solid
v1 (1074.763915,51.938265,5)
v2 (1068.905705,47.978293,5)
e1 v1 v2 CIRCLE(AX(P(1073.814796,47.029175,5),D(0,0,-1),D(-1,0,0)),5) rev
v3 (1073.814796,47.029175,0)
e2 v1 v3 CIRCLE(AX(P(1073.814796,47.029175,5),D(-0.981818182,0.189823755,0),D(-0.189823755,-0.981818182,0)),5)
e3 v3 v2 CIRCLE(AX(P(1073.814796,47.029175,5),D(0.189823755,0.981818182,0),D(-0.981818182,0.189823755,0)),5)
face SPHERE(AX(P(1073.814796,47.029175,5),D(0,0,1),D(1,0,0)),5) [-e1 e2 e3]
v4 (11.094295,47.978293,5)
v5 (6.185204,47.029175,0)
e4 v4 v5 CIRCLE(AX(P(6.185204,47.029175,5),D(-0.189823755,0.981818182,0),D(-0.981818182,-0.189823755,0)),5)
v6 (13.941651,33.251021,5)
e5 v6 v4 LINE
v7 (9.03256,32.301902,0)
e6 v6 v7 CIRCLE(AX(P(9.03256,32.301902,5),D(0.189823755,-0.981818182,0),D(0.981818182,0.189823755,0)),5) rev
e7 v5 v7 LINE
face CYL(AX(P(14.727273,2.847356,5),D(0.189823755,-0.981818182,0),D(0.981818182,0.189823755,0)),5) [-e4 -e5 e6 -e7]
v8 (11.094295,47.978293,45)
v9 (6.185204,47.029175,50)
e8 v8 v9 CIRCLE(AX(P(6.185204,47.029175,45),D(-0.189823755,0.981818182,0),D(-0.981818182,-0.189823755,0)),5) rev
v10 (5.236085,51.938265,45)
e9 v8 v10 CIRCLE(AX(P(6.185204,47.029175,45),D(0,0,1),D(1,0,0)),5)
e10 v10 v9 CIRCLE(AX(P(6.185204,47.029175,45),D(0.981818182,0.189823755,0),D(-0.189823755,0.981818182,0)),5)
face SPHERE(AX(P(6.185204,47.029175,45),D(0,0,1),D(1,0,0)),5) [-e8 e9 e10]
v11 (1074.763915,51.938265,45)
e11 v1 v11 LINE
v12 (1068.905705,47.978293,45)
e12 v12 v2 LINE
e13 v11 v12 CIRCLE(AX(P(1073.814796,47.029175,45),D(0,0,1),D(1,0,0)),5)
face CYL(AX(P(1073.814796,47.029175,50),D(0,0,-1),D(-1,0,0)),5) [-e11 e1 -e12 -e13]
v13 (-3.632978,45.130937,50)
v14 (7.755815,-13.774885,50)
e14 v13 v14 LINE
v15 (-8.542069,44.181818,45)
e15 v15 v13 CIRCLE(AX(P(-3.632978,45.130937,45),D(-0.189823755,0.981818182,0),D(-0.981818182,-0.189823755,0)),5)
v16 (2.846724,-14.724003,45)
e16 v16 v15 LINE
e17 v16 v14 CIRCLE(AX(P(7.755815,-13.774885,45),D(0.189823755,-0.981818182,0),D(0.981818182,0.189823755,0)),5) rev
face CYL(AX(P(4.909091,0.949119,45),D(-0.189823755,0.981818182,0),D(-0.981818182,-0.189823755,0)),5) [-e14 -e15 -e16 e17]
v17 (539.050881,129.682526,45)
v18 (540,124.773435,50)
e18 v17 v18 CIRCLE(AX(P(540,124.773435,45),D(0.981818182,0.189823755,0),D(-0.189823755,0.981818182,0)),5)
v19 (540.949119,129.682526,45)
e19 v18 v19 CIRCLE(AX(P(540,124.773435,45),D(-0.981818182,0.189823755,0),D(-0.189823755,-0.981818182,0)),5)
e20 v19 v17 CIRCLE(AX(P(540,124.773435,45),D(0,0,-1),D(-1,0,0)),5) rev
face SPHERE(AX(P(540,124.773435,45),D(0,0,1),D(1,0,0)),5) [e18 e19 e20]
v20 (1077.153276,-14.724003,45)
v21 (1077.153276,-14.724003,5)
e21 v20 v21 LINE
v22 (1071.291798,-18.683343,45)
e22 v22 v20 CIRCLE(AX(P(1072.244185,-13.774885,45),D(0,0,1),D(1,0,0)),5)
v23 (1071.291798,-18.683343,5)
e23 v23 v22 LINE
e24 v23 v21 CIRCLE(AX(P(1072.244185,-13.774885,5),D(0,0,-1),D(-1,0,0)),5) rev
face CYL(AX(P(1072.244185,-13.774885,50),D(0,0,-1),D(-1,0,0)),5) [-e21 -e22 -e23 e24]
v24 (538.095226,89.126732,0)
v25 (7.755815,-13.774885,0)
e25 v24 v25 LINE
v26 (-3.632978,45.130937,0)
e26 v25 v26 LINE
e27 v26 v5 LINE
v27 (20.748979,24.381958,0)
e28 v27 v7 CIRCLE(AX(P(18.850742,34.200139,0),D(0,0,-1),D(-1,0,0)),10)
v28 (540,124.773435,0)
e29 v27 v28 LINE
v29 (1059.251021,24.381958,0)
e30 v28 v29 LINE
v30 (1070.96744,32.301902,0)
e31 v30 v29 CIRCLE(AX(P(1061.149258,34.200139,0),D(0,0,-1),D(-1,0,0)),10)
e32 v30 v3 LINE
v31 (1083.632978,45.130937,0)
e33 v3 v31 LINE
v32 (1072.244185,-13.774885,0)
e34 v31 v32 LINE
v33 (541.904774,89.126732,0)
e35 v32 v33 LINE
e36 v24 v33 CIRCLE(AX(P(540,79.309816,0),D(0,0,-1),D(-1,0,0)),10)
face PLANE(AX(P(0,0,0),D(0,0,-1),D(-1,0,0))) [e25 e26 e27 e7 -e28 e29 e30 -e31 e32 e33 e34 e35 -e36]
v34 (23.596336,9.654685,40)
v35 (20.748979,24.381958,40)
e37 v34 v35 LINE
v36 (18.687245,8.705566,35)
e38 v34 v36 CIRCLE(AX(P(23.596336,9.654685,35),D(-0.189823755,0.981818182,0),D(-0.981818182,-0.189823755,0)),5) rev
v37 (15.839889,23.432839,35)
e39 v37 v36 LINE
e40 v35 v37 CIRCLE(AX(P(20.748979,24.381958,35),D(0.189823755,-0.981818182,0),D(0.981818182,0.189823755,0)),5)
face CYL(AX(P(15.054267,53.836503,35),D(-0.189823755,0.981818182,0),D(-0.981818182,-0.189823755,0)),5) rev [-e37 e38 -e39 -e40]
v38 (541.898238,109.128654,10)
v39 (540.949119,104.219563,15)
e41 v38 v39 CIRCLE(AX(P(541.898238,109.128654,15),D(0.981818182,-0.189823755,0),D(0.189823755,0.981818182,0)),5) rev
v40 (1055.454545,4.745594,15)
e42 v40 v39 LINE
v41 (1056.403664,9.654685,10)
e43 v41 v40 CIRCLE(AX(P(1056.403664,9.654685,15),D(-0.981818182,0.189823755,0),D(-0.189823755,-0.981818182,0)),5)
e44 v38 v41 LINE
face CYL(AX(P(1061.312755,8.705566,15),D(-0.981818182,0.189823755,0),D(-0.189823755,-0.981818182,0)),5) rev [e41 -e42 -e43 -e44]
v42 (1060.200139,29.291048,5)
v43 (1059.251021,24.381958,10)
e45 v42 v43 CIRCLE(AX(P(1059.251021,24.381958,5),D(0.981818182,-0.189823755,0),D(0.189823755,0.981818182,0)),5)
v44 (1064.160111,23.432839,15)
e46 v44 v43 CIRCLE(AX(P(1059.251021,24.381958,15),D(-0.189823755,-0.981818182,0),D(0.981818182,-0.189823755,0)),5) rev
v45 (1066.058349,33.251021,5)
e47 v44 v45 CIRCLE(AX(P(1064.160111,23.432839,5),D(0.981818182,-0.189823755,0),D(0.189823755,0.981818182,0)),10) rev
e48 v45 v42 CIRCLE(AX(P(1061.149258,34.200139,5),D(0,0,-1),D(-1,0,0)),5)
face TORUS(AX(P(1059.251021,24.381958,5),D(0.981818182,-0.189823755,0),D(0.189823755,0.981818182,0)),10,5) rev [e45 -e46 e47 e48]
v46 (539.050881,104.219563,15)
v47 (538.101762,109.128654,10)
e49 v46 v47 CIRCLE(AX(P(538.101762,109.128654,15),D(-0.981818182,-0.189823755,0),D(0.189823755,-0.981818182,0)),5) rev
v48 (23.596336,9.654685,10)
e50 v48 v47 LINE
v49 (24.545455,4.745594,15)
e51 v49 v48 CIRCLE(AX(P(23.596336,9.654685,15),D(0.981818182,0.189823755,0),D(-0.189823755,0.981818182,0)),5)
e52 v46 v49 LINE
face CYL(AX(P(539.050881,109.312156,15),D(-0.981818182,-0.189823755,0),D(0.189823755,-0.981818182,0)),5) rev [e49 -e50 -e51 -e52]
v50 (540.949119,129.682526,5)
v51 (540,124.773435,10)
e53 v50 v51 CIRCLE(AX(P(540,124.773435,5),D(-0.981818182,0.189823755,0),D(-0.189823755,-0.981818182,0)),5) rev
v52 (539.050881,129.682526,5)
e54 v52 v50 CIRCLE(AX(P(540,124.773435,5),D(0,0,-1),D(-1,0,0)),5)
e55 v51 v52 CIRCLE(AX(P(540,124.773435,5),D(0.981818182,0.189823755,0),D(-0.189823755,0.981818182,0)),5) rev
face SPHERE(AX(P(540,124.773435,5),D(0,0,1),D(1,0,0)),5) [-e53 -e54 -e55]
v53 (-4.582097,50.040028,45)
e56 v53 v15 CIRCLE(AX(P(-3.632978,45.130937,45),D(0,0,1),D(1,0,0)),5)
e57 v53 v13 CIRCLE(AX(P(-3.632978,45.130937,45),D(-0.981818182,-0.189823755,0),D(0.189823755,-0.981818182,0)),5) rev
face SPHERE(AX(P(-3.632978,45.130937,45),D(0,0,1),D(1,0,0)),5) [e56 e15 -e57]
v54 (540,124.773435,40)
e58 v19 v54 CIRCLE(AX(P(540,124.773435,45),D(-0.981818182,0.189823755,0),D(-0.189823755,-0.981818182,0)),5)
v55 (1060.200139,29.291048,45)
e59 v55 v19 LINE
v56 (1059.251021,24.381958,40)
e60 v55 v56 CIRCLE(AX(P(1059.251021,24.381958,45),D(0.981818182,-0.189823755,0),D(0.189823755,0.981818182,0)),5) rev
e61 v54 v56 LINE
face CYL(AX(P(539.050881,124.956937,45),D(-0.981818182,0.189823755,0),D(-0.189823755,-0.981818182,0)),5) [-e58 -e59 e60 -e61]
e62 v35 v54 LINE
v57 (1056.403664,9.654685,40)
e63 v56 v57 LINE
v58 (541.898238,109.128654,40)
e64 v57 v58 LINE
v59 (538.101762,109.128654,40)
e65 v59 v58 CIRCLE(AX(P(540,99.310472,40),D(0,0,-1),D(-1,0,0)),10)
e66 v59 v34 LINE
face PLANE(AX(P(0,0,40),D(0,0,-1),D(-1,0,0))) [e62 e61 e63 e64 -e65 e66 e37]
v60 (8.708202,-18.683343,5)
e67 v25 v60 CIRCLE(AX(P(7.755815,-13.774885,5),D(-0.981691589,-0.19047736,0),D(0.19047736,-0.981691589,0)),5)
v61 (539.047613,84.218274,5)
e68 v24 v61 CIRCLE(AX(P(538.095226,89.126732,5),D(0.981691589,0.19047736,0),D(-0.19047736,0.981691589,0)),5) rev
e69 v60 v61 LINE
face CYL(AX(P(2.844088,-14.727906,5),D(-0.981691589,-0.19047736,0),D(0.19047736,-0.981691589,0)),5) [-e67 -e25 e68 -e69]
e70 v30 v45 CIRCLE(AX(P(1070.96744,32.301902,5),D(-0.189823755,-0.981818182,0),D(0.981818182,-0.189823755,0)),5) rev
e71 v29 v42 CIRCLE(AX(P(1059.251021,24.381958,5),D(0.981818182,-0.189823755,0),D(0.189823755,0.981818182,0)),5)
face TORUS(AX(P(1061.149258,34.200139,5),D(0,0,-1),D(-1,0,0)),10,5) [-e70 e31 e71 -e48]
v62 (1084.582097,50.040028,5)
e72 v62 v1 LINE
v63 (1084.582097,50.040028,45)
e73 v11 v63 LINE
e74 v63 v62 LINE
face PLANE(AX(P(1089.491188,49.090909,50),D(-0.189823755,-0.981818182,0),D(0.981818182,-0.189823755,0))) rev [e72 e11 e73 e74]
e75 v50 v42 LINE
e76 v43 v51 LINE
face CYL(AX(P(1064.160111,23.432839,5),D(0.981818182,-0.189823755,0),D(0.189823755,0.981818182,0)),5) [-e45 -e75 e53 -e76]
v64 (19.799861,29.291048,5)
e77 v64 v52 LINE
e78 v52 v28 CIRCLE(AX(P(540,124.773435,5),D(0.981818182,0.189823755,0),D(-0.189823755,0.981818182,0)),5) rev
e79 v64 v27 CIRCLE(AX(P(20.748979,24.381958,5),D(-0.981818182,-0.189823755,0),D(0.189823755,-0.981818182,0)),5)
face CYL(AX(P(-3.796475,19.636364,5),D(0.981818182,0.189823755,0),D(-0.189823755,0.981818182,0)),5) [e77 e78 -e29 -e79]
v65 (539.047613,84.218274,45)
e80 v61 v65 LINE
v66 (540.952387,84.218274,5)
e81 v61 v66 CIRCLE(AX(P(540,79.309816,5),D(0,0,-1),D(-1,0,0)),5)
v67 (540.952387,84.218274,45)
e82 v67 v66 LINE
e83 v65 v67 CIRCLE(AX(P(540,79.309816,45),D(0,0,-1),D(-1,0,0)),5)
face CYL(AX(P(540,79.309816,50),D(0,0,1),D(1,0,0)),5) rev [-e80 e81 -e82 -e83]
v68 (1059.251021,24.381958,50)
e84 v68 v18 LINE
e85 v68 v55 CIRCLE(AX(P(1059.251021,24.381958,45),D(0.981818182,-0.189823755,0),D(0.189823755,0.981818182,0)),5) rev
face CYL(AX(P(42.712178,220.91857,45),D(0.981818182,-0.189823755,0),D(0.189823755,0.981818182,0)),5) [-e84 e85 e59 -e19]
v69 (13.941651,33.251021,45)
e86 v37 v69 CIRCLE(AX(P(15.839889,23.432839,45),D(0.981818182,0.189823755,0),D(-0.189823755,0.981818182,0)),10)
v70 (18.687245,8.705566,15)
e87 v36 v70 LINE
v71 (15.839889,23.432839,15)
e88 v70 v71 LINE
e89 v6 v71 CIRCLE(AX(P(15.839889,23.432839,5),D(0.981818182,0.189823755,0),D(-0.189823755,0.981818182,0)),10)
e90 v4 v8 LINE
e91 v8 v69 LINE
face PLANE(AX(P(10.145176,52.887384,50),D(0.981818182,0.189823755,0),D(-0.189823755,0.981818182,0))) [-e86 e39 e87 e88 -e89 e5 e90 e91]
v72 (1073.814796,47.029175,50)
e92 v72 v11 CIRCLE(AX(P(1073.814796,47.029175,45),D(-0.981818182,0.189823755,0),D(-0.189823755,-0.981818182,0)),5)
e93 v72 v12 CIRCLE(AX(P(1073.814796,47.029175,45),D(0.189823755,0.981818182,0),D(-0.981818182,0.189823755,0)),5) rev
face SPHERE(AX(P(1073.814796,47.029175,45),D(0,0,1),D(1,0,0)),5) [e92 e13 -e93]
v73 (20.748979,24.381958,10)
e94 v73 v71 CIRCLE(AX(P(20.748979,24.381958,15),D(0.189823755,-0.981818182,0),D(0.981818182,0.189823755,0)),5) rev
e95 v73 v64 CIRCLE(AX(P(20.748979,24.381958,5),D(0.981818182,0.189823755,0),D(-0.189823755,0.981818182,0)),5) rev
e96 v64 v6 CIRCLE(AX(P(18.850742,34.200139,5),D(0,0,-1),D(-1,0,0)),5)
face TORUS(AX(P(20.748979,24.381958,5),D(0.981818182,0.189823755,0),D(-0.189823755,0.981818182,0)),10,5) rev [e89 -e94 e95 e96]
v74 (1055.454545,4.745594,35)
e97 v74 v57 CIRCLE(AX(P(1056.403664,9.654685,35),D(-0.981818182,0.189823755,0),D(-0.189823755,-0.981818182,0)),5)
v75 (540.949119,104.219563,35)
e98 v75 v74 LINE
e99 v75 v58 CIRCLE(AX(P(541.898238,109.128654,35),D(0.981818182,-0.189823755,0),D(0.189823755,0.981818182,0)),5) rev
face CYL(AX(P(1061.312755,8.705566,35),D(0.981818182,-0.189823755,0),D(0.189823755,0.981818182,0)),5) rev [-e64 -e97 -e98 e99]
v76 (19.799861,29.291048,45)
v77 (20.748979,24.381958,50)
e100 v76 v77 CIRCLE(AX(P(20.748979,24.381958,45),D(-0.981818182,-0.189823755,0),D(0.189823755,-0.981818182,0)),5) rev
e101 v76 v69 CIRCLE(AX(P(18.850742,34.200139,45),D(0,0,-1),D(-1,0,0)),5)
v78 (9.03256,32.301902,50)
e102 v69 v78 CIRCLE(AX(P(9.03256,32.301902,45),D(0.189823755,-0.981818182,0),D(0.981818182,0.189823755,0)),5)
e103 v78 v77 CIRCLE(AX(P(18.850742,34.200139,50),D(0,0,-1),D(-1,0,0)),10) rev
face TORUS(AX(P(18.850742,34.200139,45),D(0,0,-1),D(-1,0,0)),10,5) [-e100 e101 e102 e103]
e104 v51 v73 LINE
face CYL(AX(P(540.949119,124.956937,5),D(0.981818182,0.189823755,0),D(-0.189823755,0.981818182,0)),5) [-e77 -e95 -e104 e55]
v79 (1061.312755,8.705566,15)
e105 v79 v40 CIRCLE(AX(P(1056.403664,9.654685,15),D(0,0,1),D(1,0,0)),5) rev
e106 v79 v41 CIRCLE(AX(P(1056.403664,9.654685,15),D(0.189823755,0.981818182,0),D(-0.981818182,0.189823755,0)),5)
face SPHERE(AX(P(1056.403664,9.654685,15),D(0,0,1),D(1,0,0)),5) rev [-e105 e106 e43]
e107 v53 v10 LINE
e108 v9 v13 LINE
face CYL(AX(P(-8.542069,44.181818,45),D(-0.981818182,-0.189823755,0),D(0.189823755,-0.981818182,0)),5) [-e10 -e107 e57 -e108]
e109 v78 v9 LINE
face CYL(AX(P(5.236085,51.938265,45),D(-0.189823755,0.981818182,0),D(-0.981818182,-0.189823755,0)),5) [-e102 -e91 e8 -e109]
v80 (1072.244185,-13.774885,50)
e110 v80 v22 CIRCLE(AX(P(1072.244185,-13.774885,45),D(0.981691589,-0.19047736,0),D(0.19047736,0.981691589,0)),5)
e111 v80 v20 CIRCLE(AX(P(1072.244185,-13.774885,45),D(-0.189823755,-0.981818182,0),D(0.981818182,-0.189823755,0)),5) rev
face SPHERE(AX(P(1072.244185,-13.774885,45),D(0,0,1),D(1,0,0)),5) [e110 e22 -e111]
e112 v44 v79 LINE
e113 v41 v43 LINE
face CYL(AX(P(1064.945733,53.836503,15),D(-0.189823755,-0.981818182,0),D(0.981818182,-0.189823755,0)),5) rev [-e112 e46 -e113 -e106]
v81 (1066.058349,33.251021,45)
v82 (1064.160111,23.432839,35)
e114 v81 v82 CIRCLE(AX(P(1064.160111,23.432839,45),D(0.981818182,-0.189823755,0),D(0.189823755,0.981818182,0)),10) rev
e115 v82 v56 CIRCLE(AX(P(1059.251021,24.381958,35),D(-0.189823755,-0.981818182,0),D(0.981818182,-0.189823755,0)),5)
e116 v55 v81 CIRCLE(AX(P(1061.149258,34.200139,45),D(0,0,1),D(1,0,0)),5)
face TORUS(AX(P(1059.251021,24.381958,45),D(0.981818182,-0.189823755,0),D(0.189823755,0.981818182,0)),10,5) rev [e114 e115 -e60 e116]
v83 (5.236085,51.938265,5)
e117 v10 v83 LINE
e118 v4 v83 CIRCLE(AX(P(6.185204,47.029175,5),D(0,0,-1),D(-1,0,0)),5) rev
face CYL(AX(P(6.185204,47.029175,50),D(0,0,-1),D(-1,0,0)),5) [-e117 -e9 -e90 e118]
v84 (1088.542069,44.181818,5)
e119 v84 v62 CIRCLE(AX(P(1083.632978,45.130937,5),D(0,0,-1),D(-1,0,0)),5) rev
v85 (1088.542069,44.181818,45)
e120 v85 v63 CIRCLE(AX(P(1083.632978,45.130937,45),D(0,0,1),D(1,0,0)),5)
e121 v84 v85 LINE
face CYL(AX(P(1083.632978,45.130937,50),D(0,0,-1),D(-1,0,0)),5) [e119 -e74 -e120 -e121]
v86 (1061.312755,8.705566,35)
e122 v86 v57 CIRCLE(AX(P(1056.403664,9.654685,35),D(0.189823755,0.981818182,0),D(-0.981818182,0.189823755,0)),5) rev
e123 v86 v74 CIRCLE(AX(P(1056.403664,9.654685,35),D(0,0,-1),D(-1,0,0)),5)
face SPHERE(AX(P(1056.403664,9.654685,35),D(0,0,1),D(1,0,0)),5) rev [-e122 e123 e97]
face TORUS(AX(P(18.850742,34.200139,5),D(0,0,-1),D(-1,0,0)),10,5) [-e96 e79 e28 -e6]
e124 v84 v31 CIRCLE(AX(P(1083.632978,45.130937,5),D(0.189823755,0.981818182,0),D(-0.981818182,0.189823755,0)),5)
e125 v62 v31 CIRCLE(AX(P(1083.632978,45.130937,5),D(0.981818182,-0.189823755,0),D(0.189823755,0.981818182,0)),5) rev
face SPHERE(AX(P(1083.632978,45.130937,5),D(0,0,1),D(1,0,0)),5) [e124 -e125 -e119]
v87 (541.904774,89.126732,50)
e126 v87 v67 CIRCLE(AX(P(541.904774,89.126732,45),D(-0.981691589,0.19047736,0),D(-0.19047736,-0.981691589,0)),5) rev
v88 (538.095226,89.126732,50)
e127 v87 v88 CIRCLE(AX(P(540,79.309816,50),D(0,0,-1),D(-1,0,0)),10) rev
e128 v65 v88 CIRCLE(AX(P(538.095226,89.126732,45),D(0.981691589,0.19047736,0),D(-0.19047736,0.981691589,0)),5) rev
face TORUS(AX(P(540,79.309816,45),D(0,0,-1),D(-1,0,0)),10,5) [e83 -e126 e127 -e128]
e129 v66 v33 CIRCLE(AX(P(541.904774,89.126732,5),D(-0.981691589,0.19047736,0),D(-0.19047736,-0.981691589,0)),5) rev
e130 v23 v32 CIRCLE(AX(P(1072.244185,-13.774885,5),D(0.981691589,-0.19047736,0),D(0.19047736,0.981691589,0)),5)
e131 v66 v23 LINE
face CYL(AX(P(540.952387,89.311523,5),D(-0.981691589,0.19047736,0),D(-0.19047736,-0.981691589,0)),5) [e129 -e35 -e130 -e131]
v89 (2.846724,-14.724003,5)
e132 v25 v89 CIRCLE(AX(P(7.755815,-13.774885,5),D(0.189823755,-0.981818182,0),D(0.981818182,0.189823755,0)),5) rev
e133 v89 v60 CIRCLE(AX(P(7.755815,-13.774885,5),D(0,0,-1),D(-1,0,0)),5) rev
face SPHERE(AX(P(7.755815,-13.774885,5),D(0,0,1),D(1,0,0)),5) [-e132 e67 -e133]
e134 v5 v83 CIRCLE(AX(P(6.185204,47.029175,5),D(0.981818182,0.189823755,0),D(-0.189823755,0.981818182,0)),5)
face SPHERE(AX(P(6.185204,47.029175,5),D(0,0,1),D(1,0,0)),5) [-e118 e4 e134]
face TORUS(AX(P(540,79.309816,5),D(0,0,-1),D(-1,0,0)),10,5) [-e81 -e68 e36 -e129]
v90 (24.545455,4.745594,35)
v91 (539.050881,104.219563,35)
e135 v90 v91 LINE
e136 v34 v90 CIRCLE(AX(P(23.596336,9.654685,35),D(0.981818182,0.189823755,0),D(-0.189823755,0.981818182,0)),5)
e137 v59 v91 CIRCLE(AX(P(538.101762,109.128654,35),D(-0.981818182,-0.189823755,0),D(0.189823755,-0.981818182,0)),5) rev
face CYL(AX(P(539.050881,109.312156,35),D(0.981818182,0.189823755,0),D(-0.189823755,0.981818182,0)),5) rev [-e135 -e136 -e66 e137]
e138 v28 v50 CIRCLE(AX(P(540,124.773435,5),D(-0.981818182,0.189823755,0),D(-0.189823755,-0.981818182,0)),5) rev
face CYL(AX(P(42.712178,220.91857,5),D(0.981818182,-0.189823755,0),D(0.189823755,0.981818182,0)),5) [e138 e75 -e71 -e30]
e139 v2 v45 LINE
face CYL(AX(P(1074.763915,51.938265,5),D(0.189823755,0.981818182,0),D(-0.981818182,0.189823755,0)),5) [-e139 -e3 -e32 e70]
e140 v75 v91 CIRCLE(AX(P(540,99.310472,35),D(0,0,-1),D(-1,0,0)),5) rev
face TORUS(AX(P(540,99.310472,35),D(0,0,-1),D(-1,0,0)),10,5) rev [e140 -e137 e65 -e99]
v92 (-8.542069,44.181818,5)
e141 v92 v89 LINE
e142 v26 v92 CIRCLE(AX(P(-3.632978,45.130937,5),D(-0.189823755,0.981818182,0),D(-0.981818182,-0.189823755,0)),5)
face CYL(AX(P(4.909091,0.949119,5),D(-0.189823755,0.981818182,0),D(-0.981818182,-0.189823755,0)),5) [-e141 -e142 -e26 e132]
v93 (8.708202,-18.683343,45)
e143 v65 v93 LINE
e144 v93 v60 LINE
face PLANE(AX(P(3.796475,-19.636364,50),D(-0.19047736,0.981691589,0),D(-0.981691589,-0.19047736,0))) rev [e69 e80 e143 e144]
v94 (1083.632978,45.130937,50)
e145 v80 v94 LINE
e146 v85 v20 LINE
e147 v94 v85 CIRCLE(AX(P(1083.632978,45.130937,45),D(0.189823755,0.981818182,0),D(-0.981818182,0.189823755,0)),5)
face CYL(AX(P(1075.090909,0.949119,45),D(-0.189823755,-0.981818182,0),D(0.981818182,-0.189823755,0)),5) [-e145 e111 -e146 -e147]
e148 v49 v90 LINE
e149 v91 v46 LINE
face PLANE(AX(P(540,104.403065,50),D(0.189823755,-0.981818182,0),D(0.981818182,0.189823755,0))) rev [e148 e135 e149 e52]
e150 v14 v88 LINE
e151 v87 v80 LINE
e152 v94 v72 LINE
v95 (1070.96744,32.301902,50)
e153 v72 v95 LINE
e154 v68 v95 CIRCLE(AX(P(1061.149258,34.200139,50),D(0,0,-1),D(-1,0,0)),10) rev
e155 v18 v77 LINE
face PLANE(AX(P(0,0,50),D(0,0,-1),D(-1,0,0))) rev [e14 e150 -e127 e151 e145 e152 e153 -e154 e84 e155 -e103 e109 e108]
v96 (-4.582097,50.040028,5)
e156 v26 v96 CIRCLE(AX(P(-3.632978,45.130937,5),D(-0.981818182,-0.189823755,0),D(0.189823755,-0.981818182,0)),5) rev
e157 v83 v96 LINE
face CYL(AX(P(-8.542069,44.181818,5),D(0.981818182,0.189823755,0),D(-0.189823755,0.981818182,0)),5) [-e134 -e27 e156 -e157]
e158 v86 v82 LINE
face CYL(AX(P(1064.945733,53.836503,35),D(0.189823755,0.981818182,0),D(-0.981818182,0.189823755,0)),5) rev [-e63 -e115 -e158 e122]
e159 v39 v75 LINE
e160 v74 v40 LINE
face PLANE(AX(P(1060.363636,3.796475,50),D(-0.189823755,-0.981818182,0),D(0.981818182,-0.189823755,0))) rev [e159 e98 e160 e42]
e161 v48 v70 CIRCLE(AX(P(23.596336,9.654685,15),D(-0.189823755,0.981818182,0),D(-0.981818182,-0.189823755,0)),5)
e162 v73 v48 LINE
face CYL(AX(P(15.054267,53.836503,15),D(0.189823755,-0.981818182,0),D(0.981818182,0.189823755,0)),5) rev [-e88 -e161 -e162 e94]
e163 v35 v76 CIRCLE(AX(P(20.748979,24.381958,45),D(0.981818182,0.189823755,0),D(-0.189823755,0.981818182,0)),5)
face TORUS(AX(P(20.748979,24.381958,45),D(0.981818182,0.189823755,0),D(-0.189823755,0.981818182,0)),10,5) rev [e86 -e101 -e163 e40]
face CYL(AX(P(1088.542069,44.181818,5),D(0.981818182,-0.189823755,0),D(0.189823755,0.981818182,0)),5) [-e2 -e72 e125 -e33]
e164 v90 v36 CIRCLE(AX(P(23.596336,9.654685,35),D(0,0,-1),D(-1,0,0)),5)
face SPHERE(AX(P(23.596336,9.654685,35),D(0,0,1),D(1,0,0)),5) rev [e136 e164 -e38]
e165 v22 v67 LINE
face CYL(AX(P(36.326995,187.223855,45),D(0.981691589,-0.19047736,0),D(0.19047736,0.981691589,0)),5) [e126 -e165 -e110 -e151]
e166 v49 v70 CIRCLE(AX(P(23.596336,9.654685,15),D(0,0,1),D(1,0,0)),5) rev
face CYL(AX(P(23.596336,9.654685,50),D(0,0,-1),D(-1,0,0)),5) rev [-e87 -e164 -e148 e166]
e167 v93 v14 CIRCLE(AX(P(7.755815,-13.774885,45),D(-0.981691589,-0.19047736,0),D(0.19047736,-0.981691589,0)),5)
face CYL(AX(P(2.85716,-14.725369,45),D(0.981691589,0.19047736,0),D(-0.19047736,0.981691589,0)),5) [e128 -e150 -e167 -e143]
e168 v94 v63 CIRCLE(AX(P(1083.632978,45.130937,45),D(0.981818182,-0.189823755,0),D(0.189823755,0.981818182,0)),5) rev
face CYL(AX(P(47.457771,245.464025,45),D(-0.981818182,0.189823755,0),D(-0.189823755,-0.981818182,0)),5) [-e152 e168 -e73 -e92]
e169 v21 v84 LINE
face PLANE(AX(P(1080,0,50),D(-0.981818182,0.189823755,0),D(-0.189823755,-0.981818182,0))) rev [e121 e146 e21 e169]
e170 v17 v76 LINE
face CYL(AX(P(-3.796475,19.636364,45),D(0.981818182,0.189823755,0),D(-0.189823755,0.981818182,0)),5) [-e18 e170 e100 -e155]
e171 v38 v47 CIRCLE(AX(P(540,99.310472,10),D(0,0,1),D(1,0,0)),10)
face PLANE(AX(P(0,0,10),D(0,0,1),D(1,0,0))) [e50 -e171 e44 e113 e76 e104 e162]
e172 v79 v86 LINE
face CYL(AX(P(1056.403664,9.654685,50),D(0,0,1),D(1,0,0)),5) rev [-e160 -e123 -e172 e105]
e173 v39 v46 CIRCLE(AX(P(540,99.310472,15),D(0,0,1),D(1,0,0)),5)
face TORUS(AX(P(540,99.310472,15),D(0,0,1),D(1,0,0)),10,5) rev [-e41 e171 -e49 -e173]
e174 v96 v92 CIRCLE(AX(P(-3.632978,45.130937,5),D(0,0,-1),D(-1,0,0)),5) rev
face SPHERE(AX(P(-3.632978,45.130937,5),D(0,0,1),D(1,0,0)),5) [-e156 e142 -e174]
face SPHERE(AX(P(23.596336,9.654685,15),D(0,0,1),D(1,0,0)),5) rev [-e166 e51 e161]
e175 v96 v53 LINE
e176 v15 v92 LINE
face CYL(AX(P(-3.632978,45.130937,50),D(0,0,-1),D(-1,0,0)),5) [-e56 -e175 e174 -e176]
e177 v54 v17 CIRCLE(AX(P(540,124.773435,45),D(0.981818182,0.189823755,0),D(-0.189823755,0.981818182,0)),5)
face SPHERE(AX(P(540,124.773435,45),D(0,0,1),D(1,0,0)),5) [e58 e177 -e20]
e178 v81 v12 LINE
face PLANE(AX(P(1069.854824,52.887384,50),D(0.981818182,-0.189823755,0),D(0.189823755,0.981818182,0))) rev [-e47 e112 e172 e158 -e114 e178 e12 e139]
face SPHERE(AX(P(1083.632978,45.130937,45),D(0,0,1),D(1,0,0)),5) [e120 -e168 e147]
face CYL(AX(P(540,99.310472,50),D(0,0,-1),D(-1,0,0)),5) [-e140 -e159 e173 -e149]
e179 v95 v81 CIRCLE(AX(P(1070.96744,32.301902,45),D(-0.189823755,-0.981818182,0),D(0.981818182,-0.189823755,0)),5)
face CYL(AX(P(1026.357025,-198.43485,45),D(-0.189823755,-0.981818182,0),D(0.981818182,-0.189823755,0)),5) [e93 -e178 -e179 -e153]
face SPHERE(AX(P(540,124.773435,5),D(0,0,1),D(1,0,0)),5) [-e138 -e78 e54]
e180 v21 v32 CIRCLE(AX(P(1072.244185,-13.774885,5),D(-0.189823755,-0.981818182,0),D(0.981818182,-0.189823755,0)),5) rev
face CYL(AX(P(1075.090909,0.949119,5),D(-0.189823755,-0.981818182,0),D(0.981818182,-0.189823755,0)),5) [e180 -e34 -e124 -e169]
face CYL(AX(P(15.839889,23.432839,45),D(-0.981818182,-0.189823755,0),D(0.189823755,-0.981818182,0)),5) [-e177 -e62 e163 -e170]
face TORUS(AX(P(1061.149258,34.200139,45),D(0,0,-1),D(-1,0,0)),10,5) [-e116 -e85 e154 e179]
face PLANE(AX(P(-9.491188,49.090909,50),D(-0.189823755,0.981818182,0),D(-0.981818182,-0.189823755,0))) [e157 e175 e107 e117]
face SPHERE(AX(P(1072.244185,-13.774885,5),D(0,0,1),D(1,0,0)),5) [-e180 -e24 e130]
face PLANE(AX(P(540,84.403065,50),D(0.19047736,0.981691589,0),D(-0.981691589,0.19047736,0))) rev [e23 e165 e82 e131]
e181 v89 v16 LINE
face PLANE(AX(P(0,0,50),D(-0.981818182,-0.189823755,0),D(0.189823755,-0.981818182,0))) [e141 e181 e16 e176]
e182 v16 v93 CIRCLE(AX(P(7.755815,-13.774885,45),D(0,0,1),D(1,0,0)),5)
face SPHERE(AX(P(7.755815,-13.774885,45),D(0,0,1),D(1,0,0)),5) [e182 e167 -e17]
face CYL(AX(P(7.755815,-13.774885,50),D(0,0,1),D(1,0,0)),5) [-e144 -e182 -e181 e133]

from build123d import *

# Parameters (mm, degrees)
DODANIE_WYCI_GNI_CIE1_DEPTH = 50
DODANIE_WYCI_GNI_CIE4_DEPTH = 10
DODANIE_WYCI_GNI_CIE5_DEPTH = 10
ZAOKR_GLENIE1_R             = 5


with BuildPart() as part:
    # Szkic1 → Dodanie-wyciągnięcie1 (new body)
    with BuildSketch(Plane.XY):
        Polygon((1060.363636364, 3.796475094), (540, 104.403065089), (19.636363636, 3.796475094), (10.145175901, 52.887384185), (-9.491187735, 49.090909091), (0, 0), (3.796475094, -19.636363636), (540, 84.403065089), (1076.203524906, -19.636363636), (1080, 0), (1089.491187735, 49.090909091), (1069.854824099, 52.887384185), align=None)
    extrude(amount=DODANIE_WYCI_GNI_CIE1_DEPTH)

    # Szkic4 → Dodanie-wyciągnięcie4 (add)
    with BuildSketch(Plane.XY.offset(50)):
        Polygon((19.636363636, 3.796475094), (14.890769769, 28.34192964), (540, 129.866028052), (1065.109230231, 28.34192964), (1060.363636364, 3.796475094), (540, 104.403065089), align=None)
    extrude(amount=-DODANIE_WYCI_GNI_CIE4_DEPTH)

    # Szkic5 → Dodanie-wyciągnięcie5 (add)
    with BuildSketch(Plane(origin=(0, 0, 0), x_dir=(-1, 0, 0), z_dir=(0, 0, -1))):
        Polygon((-1060.363636364, 3.796475094), (-1065.109230231, 28.34192964), (-540, 129.866028052), (-14.890769769, 28.34192964), (-19.636363636, 3.796475094), (-540, 104.403065089), align=None)
    extrude(amount=-DODANIE_WYCI_GNI_CIE5_DEPTH)

    # Zaokrąglenie1
    zaokr_glenie1_edges = [part.edges().sort_by_distance(p)[0] for p in [
        (271.898237547, 32.383350726, 50),
        (1082.847356321, 14.727272727, 0),
        (1079.673005917, 50.989146638, 0),
        (1067.482027165, 40.614656912, 0),
        (12.517972835, 40.614656912, 0),
        (-2.847356321, 14.727272727, 50),
        (0.326994083, 50.989146638, 0),
        (-2.847356321, 14.727272727, 0),
        (271.898237547, 32.383350726, 0),
        (808.101762453, 32.383350726, 0),
        (0.326994083, 50.989146638, 50),
        (1089.491187735, 49.090909091, 25),
        (1069.854824099, 52.887384185, 25),
        (10.145175901, 52.887384185, 25),
        (-9.491187735, 49.090909091, 25),
        (3.796475094, -19.636363636, 25),
        (540, 84.403065089, 25),
        (1076.203524906, -19.636363636, 25),
        (12.517972835, 40.614656912, 50),
        (1067.482027165, 40.614656912, 50),
        (1079.673005917, 50.989146638, 50),
        (19.636363636, 3.796475094, 25),
        (540, 104.403065089, 25),
        (1060.363636364, 3.796475094, 25),
        (279.818181818, 54.099770092, 40),
        (17.263566703, 16.069202367, 40),
        (1082.847356321, 14.727272727, 50),
        (277.445384884, 79.103978846, 40),
        (14.890769769, 28.34192964, 45),
        (802.554615116, 79.103978846, 40),
        (540, 129.866028052, 45),
        (1062.736433297, 16.069202367, 40),
        (1065.109230231, 28.34192964, 45),
        (800.181818182, 54.099770092, 40),
        (802.554615116, 79.103978846, 50),
        (277.445384884, 79.103978846, 50),
        (800.181818182, 54.099770092, 10),
        (1062.736433297, 16.069202367, 10),
        (802.554615116, 79.103978846, 10),
        (1065.109230231, 28.34192964, 5),
        (277.445384884, 79.103978846, 10),
        (540, 129.866028052, 5),
        (17.263566703, 16.069202367, 10),
        (14.890769769, 28.34192964, 5),
        (279.818181818, 54.099770092, 10),
        (277.445384884, 79.103978846, 0),
        (802.554615116, 79.103978846, 0),
        (808.101762453, 32.383350726, 50),
    ]]
    fillet(zaokr_glenie1_edges, radius=ZAOKR_GLENIE1_R - 0.0001)  # a hair under: the kernel refuses the full size


solid = part.part
